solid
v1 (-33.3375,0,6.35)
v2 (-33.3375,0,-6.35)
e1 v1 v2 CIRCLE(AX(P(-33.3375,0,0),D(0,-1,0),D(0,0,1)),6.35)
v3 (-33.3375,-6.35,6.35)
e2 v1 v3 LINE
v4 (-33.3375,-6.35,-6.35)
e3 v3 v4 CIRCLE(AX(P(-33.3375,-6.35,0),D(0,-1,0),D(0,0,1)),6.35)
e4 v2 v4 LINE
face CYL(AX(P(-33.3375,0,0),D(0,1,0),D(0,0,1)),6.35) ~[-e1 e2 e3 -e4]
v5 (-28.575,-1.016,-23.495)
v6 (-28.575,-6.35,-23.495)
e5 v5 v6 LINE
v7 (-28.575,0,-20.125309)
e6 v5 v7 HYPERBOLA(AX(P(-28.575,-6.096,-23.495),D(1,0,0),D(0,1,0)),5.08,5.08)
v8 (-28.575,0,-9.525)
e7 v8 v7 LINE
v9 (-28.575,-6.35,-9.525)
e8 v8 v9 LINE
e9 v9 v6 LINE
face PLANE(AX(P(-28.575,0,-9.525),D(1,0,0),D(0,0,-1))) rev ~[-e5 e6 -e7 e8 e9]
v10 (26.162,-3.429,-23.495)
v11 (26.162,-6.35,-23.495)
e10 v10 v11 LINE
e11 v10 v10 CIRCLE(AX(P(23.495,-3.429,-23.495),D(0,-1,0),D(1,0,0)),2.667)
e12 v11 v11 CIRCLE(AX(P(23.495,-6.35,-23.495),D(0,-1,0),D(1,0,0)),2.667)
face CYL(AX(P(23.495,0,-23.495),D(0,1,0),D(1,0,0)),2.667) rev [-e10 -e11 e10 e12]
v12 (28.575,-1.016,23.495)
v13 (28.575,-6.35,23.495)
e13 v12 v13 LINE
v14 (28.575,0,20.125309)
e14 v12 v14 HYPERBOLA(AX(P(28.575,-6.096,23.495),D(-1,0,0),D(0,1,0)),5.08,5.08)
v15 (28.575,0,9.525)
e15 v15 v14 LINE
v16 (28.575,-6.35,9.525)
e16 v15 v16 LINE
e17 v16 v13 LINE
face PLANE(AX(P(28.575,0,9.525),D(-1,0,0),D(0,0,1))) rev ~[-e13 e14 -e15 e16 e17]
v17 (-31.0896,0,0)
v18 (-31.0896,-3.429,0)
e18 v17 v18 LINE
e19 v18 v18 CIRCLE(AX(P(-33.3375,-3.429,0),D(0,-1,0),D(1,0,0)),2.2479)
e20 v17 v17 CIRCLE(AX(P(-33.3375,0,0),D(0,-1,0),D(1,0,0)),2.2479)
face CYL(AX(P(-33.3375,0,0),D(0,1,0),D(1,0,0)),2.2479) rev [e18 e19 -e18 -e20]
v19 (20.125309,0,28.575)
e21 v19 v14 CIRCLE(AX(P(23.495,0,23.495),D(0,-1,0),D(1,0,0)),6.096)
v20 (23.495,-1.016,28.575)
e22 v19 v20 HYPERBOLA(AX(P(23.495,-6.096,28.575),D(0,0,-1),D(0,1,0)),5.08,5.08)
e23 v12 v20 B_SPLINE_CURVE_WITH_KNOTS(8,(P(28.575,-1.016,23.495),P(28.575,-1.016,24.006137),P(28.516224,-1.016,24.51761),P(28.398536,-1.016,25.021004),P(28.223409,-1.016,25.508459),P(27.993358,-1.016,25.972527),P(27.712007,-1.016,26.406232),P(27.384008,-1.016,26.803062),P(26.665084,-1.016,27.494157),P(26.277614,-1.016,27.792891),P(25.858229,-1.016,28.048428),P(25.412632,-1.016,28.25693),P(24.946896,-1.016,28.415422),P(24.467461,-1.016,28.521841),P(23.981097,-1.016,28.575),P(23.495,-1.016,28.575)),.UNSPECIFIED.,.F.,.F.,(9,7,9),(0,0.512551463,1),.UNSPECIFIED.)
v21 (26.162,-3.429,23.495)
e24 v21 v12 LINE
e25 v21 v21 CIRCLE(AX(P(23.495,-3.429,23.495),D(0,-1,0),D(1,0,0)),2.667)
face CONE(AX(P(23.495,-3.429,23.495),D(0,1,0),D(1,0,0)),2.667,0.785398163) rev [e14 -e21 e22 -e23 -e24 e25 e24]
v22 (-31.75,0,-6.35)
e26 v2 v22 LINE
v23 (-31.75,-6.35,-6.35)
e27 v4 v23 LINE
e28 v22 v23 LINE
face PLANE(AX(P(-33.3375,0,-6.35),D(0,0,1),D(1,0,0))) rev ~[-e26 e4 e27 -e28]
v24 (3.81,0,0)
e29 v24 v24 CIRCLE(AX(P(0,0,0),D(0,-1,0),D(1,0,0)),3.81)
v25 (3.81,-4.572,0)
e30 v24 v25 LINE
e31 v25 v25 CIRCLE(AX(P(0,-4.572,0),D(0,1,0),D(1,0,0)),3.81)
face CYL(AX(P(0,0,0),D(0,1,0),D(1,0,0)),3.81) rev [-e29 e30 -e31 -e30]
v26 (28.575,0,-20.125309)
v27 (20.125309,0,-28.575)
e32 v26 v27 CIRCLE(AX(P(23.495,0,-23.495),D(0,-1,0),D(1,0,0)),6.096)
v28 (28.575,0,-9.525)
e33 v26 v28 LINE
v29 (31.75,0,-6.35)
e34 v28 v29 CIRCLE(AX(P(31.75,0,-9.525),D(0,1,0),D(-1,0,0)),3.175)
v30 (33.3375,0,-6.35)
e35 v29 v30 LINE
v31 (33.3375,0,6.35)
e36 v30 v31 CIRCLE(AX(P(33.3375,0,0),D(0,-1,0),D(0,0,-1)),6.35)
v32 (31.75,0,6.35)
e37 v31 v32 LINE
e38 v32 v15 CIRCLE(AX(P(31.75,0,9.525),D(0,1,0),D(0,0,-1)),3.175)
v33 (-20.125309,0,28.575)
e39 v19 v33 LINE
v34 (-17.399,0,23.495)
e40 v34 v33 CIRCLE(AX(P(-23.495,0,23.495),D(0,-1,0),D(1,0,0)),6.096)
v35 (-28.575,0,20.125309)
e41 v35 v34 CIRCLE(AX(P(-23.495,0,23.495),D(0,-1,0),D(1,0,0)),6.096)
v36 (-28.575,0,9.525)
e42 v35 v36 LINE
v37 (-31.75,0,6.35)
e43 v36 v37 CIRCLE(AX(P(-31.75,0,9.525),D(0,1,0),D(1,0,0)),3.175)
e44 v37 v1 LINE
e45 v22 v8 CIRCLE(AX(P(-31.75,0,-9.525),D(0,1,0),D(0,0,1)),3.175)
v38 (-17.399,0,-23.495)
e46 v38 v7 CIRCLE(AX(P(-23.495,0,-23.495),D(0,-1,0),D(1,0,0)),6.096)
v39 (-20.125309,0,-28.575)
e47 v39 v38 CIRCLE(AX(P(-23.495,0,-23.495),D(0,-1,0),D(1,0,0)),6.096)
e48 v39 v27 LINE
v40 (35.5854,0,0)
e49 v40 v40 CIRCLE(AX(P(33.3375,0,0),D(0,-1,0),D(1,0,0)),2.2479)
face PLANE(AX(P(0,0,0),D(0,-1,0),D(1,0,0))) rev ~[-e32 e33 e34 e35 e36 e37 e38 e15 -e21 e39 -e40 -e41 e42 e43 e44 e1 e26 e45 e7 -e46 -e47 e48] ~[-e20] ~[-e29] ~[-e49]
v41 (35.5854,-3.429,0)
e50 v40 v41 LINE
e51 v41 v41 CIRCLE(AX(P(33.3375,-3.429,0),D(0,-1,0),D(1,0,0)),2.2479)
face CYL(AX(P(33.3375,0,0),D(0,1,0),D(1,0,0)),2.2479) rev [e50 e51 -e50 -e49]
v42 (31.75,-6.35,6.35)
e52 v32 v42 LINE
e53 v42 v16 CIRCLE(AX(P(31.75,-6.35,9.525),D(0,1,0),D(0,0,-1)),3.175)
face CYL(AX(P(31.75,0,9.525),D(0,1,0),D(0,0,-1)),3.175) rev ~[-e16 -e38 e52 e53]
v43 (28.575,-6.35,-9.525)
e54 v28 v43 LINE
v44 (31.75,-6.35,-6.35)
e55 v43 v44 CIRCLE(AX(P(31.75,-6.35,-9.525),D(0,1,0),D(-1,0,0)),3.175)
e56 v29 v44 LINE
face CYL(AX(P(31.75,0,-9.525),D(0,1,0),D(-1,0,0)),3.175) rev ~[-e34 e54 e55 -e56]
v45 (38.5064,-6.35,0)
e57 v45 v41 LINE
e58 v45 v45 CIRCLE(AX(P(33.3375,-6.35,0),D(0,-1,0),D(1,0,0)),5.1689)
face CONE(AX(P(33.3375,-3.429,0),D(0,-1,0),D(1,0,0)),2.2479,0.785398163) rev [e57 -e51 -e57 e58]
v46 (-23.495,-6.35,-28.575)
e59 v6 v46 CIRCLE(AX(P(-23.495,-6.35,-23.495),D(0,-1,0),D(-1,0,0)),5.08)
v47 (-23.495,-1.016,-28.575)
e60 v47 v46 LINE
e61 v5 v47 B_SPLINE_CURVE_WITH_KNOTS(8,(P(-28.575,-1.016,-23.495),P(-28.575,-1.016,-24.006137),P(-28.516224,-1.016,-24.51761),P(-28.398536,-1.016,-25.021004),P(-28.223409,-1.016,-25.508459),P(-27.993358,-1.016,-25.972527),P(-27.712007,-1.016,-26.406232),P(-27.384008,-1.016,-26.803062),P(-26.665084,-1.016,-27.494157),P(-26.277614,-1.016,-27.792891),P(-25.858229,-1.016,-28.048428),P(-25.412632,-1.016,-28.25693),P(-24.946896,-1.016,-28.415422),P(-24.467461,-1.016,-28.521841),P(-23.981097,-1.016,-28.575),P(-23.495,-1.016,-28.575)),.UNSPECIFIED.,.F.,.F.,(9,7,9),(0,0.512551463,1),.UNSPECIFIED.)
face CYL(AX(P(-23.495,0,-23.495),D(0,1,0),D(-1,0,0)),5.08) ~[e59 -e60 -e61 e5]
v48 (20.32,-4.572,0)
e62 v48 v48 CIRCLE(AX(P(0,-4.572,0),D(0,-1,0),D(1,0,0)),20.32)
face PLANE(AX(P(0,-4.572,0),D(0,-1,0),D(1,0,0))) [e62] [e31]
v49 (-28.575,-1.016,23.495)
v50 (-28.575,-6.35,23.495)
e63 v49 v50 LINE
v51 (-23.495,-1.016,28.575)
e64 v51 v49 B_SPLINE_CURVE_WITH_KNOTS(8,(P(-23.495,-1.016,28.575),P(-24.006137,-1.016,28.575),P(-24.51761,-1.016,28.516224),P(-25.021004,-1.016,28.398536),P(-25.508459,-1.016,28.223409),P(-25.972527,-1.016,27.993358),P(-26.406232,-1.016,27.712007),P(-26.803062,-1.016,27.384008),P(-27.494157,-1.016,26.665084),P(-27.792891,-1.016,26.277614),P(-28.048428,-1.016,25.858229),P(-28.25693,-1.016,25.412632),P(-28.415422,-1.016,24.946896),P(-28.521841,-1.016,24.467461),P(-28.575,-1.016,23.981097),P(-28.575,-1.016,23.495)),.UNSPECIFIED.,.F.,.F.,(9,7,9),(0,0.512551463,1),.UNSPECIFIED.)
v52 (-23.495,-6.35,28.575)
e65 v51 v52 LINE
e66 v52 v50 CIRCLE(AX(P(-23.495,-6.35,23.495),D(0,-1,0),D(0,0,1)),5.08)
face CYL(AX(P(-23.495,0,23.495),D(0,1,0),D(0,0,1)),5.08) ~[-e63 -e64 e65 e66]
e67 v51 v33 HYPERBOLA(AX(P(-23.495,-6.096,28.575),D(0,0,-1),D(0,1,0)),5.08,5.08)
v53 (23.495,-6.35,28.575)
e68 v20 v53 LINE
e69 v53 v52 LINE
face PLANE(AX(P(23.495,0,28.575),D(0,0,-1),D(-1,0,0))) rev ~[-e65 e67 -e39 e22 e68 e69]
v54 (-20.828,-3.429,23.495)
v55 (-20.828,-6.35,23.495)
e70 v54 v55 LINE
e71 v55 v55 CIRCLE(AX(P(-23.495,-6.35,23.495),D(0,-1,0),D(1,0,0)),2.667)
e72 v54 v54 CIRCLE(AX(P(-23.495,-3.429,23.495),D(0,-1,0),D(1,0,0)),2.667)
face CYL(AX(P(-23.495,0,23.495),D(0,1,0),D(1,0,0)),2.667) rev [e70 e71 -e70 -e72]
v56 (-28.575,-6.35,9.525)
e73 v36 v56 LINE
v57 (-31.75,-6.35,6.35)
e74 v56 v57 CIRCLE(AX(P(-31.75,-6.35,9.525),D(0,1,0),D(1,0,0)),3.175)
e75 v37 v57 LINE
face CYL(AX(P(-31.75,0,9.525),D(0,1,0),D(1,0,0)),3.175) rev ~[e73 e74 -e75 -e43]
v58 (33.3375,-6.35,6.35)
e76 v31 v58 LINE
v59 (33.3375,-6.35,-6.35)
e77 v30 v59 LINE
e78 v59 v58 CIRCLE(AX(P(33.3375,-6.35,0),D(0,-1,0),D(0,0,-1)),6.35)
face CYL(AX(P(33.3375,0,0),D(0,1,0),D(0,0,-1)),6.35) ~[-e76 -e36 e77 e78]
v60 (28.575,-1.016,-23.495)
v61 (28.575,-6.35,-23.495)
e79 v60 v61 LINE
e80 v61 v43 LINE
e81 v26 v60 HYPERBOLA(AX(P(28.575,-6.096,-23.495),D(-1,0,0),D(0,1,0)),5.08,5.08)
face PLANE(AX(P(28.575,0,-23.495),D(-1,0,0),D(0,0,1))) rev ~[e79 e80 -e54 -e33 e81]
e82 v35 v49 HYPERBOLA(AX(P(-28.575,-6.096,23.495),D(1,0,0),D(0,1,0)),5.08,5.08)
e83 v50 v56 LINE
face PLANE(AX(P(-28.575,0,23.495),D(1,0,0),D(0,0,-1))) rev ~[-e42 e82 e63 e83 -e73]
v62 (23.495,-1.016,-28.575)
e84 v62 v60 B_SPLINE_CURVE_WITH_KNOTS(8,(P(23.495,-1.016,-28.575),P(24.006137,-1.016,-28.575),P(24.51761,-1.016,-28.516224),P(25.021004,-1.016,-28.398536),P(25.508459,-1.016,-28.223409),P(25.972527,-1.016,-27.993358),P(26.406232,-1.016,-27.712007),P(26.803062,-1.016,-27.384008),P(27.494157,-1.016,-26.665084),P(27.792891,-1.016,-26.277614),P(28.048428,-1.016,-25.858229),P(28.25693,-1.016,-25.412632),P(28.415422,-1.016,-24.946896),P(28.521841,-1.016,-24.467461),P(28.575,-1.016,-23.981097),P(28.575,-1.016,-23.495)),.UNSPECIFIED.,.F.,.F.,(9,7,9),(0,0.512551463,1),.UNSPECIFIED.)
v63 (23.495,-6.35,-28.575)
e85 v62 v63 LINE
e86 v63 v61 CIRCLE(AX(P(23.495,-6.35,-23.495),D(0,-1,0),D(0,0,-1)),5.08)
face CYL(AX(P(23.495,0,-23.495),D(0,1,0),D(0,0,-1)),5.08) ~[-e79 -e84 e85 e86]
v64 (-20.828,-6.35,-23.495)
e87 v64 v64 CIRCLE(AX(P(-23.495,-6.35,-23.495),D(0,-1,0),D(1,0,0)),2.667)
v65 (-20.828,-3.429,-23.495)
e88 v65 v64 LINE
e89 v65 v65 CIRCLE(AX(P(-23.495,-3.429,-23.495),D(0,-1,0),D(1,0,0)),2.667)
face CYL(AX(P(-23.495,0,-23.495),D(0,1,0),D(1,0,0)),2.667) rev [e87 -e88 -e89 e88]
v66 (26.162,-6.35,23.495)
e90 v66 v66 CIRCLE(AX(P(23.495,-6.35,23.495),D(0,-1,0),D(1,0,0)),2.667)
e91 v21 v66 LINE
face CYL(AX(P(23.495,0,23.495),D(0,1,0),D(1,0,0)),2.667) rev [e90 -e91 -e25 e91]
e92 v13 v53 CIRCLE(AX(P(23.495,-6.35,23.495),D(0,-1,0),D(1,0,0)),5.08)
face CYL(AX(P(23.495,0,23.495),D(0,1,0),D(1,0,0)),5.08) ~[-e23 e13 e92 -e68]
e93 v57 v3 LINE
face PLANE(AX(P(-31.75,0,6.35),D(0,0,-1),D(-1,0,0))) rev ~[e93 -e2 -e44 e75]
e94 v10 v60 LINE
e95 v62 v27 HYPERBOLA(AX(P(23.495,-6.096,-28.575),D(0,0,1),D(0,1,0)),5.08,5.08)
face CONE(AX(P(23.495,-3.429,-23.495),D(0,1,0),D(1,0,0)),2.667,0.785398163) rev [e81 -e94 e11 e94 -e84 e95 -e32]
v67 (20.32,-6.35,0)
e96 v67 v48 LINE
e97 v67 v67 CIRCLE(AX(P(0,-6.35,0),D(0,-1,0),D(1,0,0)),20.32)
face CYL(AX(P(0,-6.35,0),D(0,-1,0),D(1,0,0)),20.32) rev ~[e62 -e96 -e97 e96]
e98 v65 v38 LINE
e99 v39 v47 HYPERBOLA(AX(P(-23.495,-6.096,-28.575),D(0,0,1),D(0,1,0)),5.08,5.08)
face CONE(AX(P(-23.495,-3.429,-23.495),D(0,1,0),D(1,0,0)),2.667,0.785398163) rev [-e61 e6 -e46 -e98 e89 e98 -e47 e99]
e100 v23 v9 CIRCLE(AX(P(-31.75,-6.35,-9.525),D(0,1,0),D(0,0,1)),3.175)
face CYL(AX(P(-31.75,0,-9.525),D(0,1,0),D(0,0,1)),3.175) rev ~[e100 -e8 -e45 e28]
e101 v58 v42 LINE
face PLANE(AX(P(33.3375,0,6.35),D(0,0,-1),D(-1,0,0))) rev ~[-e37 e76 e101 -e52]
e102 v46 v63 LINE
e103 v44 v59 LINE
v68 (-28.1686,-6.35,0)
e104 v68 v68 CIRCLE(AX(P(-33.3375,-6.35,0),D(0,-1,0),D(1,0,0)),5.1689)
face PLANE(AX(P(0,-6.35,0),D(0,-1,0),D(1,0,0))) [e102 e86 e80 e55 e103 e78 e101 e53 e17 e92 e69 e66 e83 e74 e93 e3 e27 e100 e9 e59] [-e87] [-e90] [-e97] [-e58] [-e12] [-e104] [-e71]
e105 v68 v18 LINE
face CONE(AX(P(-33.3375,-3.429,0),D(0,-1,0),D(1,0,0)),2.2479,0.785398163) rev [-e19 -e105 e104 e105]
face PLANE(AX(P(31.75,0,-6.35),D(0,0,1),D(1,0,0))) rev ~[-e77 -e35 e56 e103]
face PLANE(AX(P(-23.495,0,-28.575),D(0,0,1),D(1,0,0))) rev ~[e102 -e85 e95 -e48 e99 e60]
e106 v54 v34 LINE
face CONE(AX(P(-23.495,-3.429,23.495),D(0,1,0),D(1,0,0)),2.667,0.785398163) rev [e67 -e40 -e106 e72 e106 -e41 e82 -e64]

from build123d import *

# Parameters (mm, degrees)
F0_R     = 2.667
F0_R_2   = 2.2479
F0_R_3   = 3.81
F1_DEPTH = 6.35
F2_R     = 20.32
F2_R_2   = 3.81
F3_DEPTH = 1.778
F4_SIZE  = 2.921


# Not quite as in the source:
# - a fillet or chamfer that OpenCascade refuses, or shapes differently, is made with other operations: its cross-section is extruded or revolved along the edge and cut away or added


with BuildPart() as f1:
    # F0 (on Front) → F1 (new body)
    with BuildSketch(Plane.XZ):
        with BuildLine():
            Line((-23.495, -28.575), (23.495, -28.575))
            ThreePointArc((23.495, -28.575), (27.0871024484, -27.0871024484), (28.575, -23.495))
            Line((28.575, -23.495), (28.575, -9.525))
            ThreePointArc((28.575, -9.525), (29.5049359697, -7.2799359697), (31.75, -6.35))
            Line((31.75, -6.35), (33.3375, -6.35))
            ThreePointArc((33.3375, -6.35), (39.6875, 0), (33.3375, 6.35))
            Line((33.3375, 6.35), (31.75, 6.35))
            ThreePointArc((31.75, 6.35), (29.5049359697, 7.2799359697), (28.575, 9.525))
            Line((28.575, 9.525), (28.575, 23.495))
            ThreePointArc((28.575, 23.495), (27.0871024484, 27.0871024484), (23.495, 28.575))
            Line((23.495, 28.575), (-23.495, 28.575))
            ThreePointArc((-23.495, 28.575), (-27.0871024484, 27.0871024484), (-28.575, 23.495))
            Line((-28.575, 23.495), (-28.575, 9.525))
            ThreePointArc((-28.575, 9.525), (-29.5049359697, 7.2799359697), (-31.75, 6.35))
            Line((-31.75, 6.35), (-33.3375, 6.35))
            ThreePointArc((-33.3375, 6.35), (-39.6875, 0), (-33.3375, -6.35))
            Line((-33.3375, -6.35), (-31.75, -6.35))
            ThreePointArc((-31.75, -6.35), (-29.5049359697, -7.2799359697), (-28.575, -9.525))
            Line((-28.575, -9.525), (-28.575, -23.495))
            ThreePointArc((-28.575, -23.495), (-27.0871024484, -27.0871024484), (-23.495, -28.575))
        make_face()
        with Locations((-23.495, -23.495)):
            Circle(F0_R, mode=Mode.SUBTRACT)
        with Locations((23.495, -23.495)):
            Circle(F0_R, mode=Mode.SUBTRACT)
        with Locations((-33.3375, 0)):
            Circle(F0_R_2, mode=Mode.SUBTRACT)
        with Locations((-23.495, 23.495)):
            Circle(F0_R, mode=Mode.SUBTRACT)
        Circle(F0_R_3, mode=Mode.SUBTRACT)
        with Locations((33.3375, 0)):
            Circle(F0_R_2, mode=Mode.SUBTRACT)
        with Locations((23.495, 23.495)):
            Circle(F0_R, mode=Mode.SUBTRACT)
    extrude(amount=F1_DEPTH)

    # F2 (on face) → F3 (cut)
    with BuildSketch(Plane.XZ.offset(6.35)):
        Circle(F2_R)
        Circle(F2_R_2, mode=Mode.SUBTRACT)
        Circle(F2_R)
    extrude(amount=-F3_DEPTH, mode=Mode.SUBTRACT)

    # F4
    f4_edges = [f1.edges().sort_by_distance(p)[0] for p in [
        (-35.5854, -6.35, 0),
        (31.0896, -6.35, 0),
    ]]
    chamfer(f4_edges, length=F4_SIZE)

    # F5: chamfer of 3.429 on 4 edges, made by hand

    # F5_s1 → F5_t2 (revolve, cut)
    with BuildSketch(Plane.XY.offset(23.495)):
        Polygon((26.162, -3.429), (29.591, 0), (26.162, 0), align=None)
    revolve(axis=Axis((23.495, 0, 23.495), (0, -1, 0)), mode=Mode.SUBTRACT)

    # F5_s3 → F5_t4 (revolve, cut)
    with BuildSketch(Plane.XY.offset(23.495)):
        Polygon((-20.828, -3.429), (-17.399, 0), (-20.828, 0), align=None)
    revolve(axis=Axis((-23.495, 0, 23.495), (0, -1, 0)), mode=Mode.SUBTRACT)

    # F5_s5 → F5_t6 (revolve, cut)
    with BuildSketch(Plane.XY.offset(-23.495)):
        Polygon((26.162, -3.429), (29.591, 0), (26.162, 0), align=None)
    revolve(axis=Axis((23.495, 0, -23.495), (0, -1, 0)), mode=Mode.SUBTRACT)

    # F5_s7 → F5_t8 (revolve, cut)
    with BuildSketch(Plane.XY.offset(-23.495)):
        Polygon((-20.828, -3.429), (-17.399, 0), (-20.828, 0), align=None)
    revolve(axis=Axis((-23.495, 0, -23.495), (0, -1, 0)), mode=Mode.SUBTRACT)


solid = f1.part
